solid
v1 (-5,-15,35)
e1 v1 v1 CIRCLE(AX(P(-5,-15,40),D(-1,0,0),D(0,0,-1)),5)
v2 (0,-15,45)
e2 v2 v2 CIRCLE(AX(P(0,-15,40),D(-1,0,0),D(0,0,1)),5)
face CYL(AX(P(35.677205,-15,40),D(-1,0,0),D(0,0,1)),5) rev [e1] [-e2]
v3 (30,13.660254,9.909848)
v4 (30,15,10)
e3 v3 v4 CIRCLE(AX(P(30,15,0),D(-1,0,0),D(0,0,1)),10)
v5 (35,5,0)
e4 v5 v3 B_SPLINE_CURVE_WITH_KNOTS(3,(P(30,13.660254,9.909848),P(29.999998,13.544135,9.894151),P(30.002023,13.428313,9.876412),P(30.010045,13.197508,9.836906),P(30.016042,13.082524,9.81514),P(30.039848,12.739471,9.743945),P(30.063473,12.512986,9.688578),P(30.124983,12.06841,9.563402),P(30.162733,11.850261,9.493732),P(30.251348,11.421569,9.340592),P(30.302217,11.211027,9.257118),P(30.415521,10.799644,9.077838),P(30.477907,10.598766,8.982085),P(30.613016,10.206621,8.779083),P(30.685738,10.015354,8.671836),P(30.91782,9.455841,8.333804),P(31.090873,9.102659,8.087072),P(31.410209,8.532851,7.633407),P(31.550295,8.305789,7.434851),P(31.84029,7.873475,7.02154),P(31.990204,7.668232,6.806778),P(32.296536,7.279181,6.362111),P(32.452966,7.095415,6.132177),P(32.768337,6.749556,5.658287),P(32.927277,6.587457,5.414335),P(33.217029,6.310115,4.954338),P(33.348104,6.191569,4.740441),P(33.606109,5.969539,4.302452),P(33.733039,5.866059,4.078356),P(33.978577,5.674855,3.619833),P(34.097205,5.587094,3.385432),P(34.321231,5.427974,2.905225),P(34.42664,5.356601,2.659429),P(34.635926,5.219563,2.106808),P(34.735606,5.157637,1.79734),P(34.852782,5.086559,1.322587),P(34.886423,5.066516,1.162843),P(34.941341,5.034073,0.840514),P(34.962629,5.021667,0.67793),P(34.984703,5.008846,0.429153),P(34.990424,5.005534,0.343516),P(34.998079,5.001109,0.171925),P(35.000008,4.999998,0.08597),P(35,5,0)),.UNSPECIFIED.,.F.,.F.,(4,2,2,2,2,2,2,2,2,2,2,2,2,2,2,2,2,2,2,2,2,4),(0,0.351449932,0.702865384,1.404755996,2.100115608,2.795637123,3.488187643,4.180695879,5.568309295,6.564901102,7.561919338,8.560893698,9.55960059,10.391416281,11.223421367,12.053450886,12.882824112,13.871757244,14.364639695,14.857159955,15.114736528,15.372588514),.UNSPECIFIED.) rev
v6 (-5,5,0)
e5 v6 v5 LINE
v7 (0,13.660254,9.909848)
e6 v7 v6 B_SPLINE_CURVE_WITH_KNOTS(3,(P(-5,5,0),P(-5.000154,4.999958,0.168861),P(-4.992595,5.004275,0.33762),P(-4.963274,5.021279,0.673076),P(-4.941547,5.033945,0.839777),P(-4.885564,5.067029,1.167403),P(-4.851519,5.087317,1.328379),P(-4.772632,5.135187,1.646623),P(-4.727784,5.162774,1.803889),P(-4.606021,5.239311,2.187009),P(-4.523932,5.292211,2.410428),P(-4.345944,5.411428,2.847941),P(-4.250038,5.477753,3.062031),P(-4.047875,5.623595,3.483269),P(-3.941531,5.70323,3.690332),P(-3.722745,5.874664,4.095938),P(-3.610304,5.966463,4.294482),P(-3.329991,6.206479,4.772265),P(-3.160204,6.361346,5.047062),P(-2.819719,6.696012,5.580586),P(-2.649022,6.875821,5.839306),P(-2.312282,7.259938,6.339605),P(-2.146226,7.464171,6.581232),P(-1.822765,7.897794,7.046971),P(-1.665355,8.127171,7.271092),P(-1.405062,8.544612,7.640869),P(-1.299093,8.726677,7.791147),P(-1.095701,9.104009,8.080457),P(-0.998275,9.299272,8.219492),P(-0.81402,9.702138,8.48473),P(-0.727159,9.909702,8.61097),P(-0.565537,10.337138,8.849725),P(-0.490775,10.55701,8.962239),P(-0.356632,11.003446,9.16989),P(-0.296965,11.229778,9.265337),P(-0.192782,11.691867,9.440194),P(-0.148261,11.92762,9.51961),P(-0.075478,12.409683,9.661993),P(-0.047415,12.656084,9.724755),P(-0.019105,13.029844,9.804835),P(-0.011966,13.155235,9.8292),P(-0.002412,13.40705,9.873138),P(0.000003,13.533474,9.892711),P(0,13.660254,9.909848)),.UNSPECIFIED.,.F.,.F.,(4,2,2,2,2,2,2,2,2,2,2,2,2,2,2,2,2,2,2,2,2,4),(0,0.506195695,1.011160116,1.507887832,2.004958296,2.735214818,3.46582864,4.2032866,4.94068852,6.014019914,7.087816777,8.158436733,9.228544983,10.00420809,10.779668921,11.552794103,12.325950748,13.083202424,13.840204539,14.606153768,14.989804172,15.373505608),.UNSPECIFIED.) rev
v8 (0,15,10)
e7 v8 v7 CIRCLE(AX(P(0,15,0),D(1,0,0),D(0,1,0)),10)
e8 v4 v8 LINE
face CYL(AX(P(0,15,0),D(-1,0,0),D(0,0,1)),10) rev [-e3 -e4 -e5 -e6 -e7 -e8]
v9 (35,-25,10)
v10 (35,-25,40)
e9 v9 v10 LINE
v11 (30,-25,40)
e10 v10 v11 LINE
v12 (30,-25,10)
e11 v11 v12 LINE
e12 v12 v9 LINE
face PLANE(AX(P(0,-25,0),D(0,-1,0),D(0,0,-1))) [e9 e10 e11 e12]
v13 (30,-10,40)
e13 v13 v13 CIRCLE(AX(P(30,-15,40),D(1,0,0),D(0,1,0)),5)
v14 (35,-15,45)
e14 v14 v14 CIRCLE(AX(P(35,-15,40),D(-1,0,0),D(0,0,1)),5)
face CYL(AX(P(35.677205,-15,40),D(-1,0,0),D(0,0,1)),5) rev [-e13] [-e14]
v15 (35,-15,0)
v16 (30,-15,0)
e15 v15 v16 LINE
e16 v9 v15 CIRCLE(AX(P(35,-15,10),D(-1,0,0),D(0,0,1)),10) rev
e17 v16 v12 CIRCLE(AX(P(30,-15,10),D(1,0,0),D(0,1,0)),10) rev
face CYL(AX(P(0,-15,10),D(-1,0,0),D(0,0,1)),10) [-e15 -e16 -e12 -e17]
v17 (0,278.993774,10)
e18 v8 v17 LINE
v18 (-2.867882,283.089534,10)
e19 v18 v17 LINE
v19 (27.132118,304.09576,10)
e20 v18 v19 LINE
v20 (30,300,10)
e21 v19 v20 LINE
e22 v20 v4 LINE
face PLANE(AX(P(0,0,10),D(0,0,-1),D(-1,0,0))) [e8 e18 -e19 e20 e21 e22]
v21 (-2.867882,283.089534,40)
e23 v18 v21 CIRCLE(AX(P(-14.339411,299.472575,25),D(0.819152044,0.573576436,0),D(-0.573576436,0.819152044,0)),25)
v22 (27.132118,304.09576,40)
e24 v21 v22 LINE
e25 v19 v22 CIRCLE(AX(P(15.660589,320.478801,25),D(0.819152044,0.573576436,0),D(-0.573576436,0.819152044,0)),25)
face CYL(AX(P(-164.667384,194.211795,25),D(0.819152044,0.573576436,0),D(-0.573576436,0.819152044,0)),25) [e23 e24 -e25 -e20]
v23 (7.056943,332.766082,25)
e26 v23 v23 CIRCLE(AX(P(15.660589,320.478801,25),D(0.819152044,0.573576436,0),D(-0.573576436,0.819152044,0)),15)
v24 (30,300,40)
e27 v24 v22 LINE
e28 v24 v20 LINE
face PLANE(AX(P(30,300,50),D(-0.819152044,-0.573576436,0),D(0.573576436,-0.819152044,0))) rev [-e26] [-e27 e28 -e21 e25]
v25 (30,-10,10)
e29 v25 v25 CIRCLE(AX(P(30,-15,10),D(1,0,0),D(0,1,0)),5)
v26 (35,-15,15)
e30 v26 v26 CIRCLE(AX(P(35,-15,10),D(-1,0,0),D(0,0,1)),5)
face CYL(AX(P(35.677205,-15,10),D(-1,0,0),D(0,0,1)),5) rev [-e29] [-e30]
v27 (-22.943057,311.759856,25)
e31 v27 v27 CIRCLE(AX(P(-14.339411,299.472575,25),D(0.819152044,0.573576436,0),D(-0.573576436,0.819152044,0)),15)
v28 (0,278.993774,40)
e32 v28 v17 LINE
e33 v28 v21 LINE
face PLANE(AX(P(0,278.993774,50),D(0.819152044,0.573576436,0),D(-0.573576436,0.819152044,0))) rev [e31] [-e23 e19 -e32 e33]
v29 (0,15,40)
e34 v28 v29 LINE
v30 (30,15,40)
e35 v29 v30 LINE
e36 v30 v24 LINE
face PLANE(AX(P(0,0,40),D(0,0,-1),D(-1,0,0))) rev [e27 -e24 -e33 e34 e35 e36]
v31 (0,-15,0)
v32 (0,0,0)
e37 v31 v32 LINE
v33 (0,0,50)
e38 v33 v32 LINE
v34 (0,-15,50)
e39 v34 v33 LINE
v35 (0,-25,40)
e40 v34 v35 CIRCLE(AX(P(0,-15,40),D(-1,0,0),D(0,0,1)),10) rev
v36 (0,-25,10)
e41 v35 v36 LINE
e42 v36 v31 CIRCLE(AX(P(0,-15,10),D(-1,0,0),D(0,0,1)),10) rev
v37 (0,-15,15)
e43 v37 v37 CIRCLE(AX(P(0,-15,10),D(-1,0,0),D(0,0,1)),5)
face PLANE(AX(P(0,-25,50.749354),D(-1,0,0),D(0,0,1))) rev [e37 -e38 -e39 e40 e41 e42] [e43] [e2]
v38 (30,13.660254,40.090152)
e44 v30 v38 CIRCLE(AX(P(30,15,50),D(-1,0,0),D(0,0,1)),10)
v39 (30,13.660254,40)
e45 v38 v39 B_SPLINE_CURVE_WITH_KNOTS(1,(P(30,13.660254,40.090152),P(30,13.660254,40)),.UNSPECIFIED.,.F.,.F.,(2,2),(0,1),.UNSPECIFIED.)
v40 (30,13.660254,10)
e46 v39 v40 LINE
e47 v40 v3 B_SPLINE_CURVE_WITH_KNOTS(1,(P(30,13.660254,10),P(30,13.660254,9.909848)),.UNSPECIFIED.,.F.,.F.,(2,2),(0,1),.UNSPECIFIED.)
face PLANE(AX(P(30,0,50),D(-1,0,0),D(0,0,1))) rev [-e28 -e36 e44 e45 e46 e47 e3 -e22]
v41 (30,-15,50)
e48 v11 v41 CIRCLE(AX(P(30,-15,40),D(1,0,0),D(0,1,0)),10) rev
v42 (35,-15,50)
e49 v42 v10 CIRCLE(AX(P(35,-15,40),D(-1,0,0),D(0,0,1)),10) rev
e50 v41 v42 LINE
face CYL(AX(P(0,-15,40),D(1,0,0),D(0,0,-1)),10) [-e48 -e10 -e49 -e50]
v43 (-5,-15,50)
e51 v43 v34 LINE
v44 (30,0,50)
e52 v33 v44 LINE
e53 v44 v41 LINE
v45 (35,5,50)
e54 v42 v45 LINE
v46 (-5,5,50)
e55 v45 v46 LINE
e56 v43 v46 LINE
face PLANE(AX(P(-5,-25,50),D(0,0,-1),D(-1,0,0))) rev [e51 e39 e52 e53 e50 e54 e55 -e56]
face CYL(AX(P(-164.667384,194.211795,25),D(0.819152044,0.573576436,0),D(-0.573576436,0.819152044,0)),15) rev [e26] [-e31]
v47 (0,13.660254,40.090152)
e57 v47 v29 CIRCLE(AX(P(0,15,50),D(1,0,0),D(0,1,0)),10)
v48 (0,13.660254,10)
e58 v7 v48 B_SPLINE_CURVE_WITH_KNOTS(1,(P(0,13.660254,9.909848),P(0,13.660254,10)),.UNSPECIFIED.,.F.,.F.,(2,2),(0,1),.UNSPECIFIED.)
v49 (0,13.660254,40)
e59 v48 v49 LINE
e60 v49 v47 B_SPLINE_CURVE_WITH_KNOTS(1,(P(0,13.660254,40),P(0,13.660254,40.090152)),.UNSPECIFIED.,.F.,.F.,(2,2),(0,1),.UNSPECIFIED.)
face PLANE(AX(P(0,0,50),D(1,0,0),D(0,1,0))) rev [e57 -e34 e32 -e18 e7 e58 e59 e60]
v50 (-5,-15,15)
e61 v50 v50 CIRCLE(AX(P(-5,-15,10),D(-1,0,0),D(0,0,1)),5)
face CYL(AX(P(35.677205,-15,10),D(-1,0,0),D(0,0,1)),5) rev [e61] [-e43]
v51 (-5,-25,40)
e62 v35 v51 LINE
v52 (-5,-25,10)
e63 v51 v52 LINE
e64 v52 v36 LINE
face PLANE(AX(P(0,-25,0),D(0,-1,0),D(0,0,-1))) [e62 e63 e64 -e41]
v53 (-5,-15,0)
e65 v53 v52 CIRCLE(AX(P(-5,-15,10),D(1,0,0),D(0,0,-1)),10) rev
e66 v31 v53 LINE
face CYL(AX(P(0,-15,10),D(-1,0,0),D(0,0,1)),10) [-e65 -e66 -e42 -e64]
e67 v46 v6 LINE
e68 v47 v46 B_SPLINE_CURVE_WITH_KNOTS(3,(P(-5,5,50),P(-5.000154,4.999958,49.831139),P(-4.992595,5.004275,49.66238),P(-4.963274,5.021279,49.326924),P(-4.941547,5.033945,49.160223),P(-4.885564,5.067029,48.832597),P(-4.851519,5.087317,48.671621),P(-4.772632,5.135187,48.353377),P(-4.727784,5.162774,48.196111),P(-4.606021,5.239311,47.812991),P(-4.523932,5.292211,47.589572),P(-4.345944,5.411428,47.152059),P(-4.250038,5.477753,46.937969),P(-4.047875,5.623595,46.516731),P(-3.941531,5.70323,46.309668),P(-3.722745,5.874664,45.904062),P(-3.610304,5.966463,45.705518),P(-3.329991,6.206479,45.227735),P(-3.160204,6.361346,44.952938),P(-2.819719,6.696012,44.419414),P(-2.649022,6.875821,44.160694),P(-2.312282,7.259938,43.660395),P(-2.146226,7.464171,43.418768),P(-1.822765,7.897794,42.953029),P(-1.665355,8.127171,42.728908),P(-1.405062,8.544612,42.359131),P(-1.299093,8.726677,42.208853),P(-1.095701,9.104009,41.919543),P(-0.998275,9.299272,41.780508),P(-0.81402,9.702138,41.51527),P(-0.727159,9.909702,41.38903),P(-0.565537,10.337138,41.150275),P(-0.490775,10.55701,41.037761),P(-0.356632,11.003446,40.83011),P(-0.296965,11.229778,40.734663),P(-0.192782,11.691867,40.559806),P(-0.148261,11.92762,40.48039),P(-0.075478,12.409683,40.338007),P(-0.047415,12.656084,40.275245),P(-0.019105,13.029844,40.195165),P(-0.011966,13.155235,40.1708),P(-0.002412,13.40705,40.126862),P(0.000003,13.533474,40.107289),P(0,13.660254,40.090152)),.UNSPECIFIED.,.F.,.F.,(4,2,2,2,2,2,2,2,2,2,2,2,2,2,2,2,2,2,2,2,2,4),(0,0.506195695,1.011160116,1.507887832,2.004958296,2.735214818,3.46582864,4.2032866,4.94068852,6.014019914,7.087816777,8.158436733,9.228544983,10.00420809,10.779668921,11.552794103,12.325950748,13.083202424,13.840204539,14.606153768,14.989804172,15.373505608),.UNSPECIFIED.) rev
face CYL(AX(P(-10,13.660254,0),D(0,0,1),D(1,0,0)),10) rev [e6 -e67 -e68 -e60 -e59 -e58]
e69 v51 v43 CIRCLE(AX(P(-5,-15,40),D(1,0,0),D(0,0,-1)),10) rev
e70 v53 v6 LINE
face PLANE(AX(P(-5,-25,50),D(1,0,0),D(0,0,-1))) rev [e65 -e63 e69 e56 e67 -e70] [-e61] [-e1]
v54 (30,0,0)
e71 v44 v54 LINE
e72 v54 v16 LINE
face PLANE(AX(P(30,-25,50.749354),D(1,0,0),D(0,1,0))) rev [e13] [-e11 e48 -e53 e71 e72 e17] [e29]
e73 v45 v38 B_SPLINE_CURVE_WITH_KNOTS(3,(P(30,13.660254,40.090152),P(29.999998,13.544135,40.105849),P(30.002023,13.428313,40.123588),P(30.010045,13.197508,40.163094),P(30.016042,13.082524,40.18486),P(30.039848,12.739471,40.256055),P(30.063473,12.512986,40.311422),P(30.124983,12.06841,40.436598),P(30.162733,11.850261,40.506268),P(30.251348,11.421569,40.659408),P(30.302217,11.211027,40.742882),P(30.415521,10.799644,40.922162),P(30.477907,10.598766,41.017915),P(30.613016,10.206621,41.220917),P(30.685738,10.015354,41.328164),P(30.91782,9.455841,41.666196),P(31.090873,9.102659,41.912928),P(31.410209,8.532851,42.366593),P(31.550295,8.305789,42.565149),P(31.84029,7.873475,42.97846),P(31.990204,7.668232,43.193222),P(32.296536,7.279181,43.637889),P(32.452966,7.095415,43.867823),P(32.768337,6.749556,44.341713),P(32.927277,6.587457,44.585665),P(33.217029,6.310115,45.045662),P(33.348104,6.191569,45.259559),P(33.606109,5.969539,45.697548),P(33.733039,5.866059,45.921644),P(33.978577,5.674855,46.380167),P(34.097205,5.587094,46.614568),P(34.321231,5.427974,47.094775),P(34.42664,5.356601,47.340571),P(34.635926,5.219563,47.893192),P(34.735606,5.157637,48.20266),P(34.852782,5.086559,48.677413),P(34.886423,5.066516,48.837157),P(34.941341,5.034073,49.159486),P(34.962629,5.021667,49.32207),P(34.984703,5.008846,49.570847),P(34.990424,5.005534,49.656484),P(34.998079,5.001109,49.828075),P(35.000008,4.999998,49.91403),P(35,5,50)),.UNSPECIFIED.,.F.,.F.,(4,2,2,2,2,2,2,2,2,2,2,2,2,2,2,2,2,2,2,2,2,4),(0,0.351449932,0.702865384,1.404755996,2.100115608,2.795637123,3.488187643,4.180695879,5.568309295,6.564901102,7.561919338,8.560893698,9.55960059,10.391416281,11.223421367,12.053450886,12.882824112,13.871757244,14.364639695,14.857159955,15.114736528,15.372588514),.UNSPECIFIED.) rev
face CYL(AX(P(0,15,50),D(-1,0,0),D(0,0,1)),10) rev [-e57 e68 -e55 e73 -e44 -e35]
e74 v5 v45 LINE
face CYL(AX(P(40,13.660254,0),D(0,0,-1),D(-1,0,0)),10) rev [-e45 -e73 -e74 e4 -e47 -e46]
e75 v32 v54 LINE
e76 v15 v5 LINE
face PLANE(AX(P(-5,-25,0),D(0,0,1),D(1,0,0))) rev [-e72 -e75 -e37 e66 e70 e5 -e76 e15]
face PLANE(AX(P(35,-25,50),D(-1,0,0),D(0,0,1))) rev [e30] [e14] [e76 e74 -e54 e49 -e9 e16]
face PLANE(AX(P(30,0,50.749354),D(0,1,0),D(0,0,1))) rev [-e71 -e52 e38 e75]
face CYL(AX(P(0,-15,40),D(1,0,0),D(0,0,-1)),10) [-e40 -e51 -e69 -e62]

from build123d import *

# Parameters (mm, degrees)
BOSS_EXTRUDE1_DEPTH = 50
CUT_EXTRUDE4_DEPTH  = 10
CUT_EXTRUDE5_DEPTH  = 10
SKETCH6_R           = 15
CUT_EXTRUDE6_DEPTH  = 301.947465254
CUT_EXTRUDE7_DEPTH  = 301.947465254
SKETCH8_W           = 30
SKETCH8_H           = 5
CUT_EXTRUDE8_DEPTH  = 346.907627132
SKETCH9_W           = 40
SKETCH9_H           = 50
BOSS_EXTRUDE2_DEPTH = 30
FILLET1_R           = 10
SKETCH10_W          = 30
SKETCH10_H          = 25
CUT_EXTRUDE9_DEPTH  = 347.377087182
SKETCH11_R          = 5
CUT_EXTRUDE10_DEPTH = 347.917982419


with BuildPart() as part:
    # Sketch1 → Boss-Extrude1 (new body)
    with BuildSketch(Plane.XY):
        Polygon((0, 0), (30, 0), (30, 300), (1.321178182, 340.957602214), (-28.678821818, 319.951376068), (0, 278.993773854), align=None)
    extrude(amount=BOSS_EXTRUDE1_DEPTH)

    # Sketch3 → Cut-Extrude4 (cut)
    with BuildSketch(Plane.XY.offset(50)):
        Polygon((30, 300), (0, 278.993773854), (0, 5), (30, 5), align=None)
    extrude(amount=-CUT_EXTRUDE4_DEPTH, mode=Mode.SUBTRACT)

    # Sketch4 → Cut-Extrude5 (cut)
    with BuildSketch(Plane(origin=(0, 0, 0), x_dir=(-1, 0, 0), z_dir=(0, 0, -1))):
        Polygon((-30, 300), (0, 278.993773854), (0, 5), (-30, 5), align=None)
    extrude(amount=-CUT_EXTRUDE5_DEPTH, mode=Mode.SUBTRACT)

    # Sketch6 → Cut-Extrude6 (cut, through all)
    with BuildSketch(Plane(origin=(161.084195268, 112.792367813, 0), x_dir=(0, 0, -1), z_dir=(0.819152044288991, 0.5735764363510472, 0))):
        with Locations(Location((-25, 253.538320196, 0), (0, 0, 90))):
            Circle(SKETCH6_R)
    extrude(amount=-CUT_EXTRUDE6_DEPTH, mode=Mode.SUBTRACT)

    # Sketch7 → Cut-Extrude7 (cut, through all)
    with BuildSketch(Plane(origin=(161.084195268, 112.792367813, 0), x_dir=(0, 0, -1), z_dir=(0.819152044288991, 0.5735764363510472, 0))):
        with BuildLine():
            Line((-50, 228.538320196), (-40, 228.538320196))
            Line((-40, 228.538320196), (-40, 233.538320196))
            ThreePointArc((-40, 233.538320196), (-47.360679775, 242.357980309), (-50, 253.538320196))
            Line((-50, 253.538320196), (-50, 228.538320196))
        make_face()
        with BuildLine():
            Line((-50, 278.538320196), (-50, 253.538320196))
            ThreePointArc((-50, 253.538320196), (-42.67766953, 271.215989726), (-25, 278.538320196))
            Line((-25, 278.538320196), (-50, 278.538320196))
        make_face()
        with BuildLine():
            Line((0, 278.538320196), (-25, 278.538320196))
            ThreePointArc((-25, 278.538320196), (-7.32233047, 271.215989726), (0, 253.538320196))
            Line((0, 253.538320196), (0, 278.538320196))
        make_face()
        with BuildLine():
            Line((0, 228.538320196), (0, 253.538320196))
            ThreePointArc((0, 253.538320196), (-2.639320225, 242.357980309), (-10, 233.538320196))
            Line((-10, 233.538320196), (-10, 228.538320196))
            Line((-10, 228.538320196), (0, 228.538320196))
        make_face()
    extrude(amount=-CUT_EXTRUDE7_DEPTH, mode=Mode.SUBTRACT)

    # Sketch8 → Cut-Extrude8 (cut, through all)
    with BuildSketch(Plane.XY.offset(50)):
        with Locations((15, 2.5)):
            Rectangle(SKETCH8_W, SKETCH8_H)
    extrude(amount=-CUT_EXTRUDE8_DEPTH, mode=Mode.SUBTRACT)

    # Sketch9 → Boss-Extrude2 (add)
    with BuildSketch(Plane.XZ.offset(-5)):
        with Locations((15, 25)):
            Rectangle(SKETCH9_W, SKETCH9_H)
    extrude(amount=BOSS_EXTRUDE2_DEPTH)

    # Fillet1
    # the kernel refuses this fillet: 10 mm, written as the material it adds along each edge
    with BuildSketch(Plane(origin=(0, 5, 40), x_dir=(-1, 0, 0), z_dir=(0, 0, -1))) as fillet1_piece_1:
        with BuildLine():
            CenterArc((10, 8.660254038), FILLET1_R, 180, 60)
            Line((0, 8.660254038), (0, 0))
            Line((0, 0), (5, 0))
        make_face()
    extrude(amount=30)
    with BuildSketch(Plane(origin=(30, 5, 40), x_dir=(1, 0, 0), z_dir=(0, 0, -1))) as fillet1_piece_2:
        with BuildLine():
            CenterArc((10, -8.660254038), FILLET1_R, 120, 60)
            Line((0, -8.660254038), (0, 0))
            Line((0, 0), (5, 0))
        make_face()
    extrude(amount=30)
    with BuildSketch(Plane(origin=(0, 5, 40), x_dir=(0, 0, 1), z_dir=(1, 0, 0))) as fillet1_piece_3:
        with BuildLine():
            CenterArc((FILLET1_R, -FILLET1_R), FILLET1_R, 90, 90)
            Line((0, -FILLET1_R), (0, 0))
            Line((0, 0), (FILLET1_R, 0))
        make_face()
    extrude(amount=30)
    with BuildSketch(Plane(origin=(0, 5, 10), x_dir=(0, 0, -1), z_dir=(1, 0, 0))) as fillet1_piece_4:
        with BuildLine():
            CenterArc((FILLET1_R, FILLET1_R), FILLET1_R, 180, 90)
            Line((0, FILLET1_R), (0, 0))
            Line((0, 0), (FILLET1_R, 0))
        make_face()
    extrude(amount=30)
    with BuildSketch(Plane(origin=(-25, 5, 40), x_dir=(0, 0, 1), z_dir=(1, 0, 0))) as fillet1_piece_5a_section:
        with BuildLine():
            CenterArc((FILLET1_R, -FILLET1_R), FILLET1_R, 90, 90)
            Line((0, -FILLET1_R), (0, 0))
            Line((0, 0), (FILLET1_R, 0))
        make_face()
    fillet1_piece_5a = extrude(amount=55, mode=Mode.PRIVATE)
    fillet1_piece_5a = split(fillet1_piece_5a, bisect_by=Plane(origin=(-5, 5, 40), z_dir=(1, 0, 0)), keep=Keep.TOP, mode=Mode.PRIVATE)
    fillet1_piece_5a = split(fillet1_piece_5a, bisect_by=Plane(origin=(0, 5, 40), z_dir=(-1, 0, 0)), keep=Keep.TOP, mode=Mode.PRIVATE)
    with BuildSketch(Plane(origin=(0, 5, 61.650635095), x_dir=(-1, 0, 0), z_dir=(0, 0, -1))) as fillet1_piece_5b_section:
        with BuildLine():
            CenterArc((10, 8.660254038), FILLET1_R, 180, 60)
            Line((0, 8.660254038), (0, 0))
            Line((0, 0), (5, 0))
        make_face()
    fillet1_piece_5b = extrude(amount=51.650635095, mode=Mode.PRIVATE)
    fillet1_piece_5b = split(fillet1_piece_5b, bisect_by=Plane(origin=(0, 5, 50), z_dir=(0, 0, -1)), keep=Keep.TOP, mode=Mode.PRIVATE)
    fillet1_piece_5b = split(fillet1_piece_5b, bisect_by=Plane(origin=(0, 5, 40), z_dir=(0, 0, 1)), keep=Keep.TOP, mode=Mode.PRIVATE)
    fillet1_piece_5 = fillet1_piece_5a & fillet1_piece_5b
    add(fillet1_piece_5)
    with BuildSketch(Plane(origin=(-25, 5, 10), x_dir=(0, 0, -1), z_dir=(1, 0, 0))) as fillet1_piece_6a_section:
        with BuildLine():
            CenterArc((FILLET1_R, FILLET1_R), FILLET1_R, 180, 90)
            Line((0, FILLET1_R), (0, 0))
            Line((0, 0), (FILLET1_R, 0))
        make_face()
    fillet1_piece_6a = extrude(amount=55, mode=Mode.PRIVATE)
    fillet1_piece_6a = split(fillet1_piece_6a, bisect_by=Plane(origin=(-5, 5, 10), z_dir=(1, 0, 0)), keep=Keep.TOP, mode=Mode.PRIVATE)
    fillet1_piece_6a = split(fillet1_piece_6a, bisect_by=Plane(origin=(0, 5, 10), z_dir=(-1, 0, 0)), keep=Keep.TOP, mode=Mode.PRIVATE)
    with BuildSketch(Plane(origin=(0, 5, 40), x_dir=(-1, 0, 0), z_dir=(0, 0, -1))) as fillet1_piece_6b_section:
        with BuildLine():
            CenterArc((10, 8.660254038), FILLET1_R, 180, 60)
            Line((0, 8.660254038), (0, 0))
            Line((0, 0), (5, 0))
        make_face()
    fillet1_piece_6b = extrude(amount=51.650635095, mode=Mode.PRIVATE)
    fillet1_piece_6b = split(fillet1_piece_6b, bisect_by=Plane(origin=(0, 5, 0), z_dir=(0, 0, 1)), keep=Keep.TOP, mode=Mode.PRIVATE)
    fillet1_piece_6b = split(fillet1_piece_6b, bisect_by=Plane(origin=(0, 5, 10), z_dir=(0, 0, -1)), keep=Keep.TOP, mode=Mode.PRIVATE)
    fillet1_piece_6 = fillet1_piece_6a & fillet1_piece_6b
    add(fillet1_piece_6)
    with BuildSketch(Plane(origin=(0, 5, 40), x_dir=(0, 0, 1), z_dir=(1, 0, 0))) as fillet1_piece_7a_section:
        with BuildLine():
            CenterArc((FILLET1_R, -FILLET1_R), FILLET1_R, 90, 90)
            Line((0, -FILLET1_R), (0, 0))
            Line((0, 0), (FILLET1_R, 0))
        make_face()
    fillet1_piece_7a = extrude(amount=55, mode=Mode.PRIVATE)
    fillet1_piece_7a = split(fillet1_piece_7a, bisect_by=Plane(origin=(35, 5, 40), z_dir=(-1, 0, 0)), keep=Keep.TOP, mode=Mode.PRIVATE)
    fillet1_piece_7a = split(fillet1_piece_7a, bisect_by=Plane(origin=(30, 5, 40), z_dir=(1, 0, 0)), keep=Keep.TOP, mode=Mode.PRIVATE)
    with BuildSketch(Plane(origin=(30, 5, 61.650635095), x_dir=(1, 0, 0), z_dir=(0, 0, -1))) as fillet1_piece_7b_section:
        with BuildLine():
            CenterArc((10, -8.660254038), FILLET1_R, 120, 60)
            Line((0, -8.660254038), (0, 0))
            Line((0, 0), (5, 0))
        make_face()
    fillet1_piece_7b = extrude(amount=51.650635095, mode=Mode.PRIVATE)
    fillet1_piece_7b = split(fillet1_piece_7b, bisect_by=Plane(origin=(30, 5, 50), z_dir=(0, 0, -1)), keep=Keep.TOP, mode=Mode.PRIVATE)
    fillet1_piece_7b = split(fillet1_piece_7b, bisect_by=Plane(origin=(30, 5, 40), z_dir=(0, 0, 1)), keep=Keep.TOP, mode=Mode.PRIVATE)
    fillet1_piece_7 = fillet1_piece_7a & fillet1_piece_7b
    add(fillet1_piece_7)
    with BuildSketch(Plane(origin=(30, 5, 40), x_dir=(1, 0, 0), z_dir=(0, 0, -1))) as fillet1_piece_8a_section:
        with BuildLine():
            CenterArc((10, -8.660254038), FILLET1_R, 120, 60)
            Line((0, -8.660254038), (0, 0))
            Line((0, 0), (5, 0))
        make_face()
    fillet1_piece_8a = extrude(amount=51.650635095, mode=Mode.PRIVATE)
    fillet1_piece_8a = split(fillet1_piece_8a, bisect_by=Plane(origin=(30, 5, 0), z_dir=(0, 0, 1)), keep=Keep.TOP, mode=Mode.PRIVATE)
    fillet1_piece_8a = split(fillet1_piece_8a, bisect_by=Plane(origin=(30, 5, 10), z_dir=(0, 0, -1)), keep=Keep.TOP, mode=Mode.PRIVATE)
    with BuildSketch(Plane(origin=(0, 5, 10), x_dir=(0, 0, -1), z_dir=(1, 0, 0))) as fillet1_piece_8b_section:
        with BuildLine():
            CenterArc((FILLET1_R, FILLET1_R), FILLET1_R, 180, 90)
            Line((0, FILLET1_R), (0, 0))
            Line((0, 0), (FILLET1_R, 0))
        make_face()
    fillet1_piece_8b = extrude(amount=55, mode=Mode.PRIVATE)
    fillet1_piece_8b = split(fillet1_piece_8b, bisect_by=Plane(origin=(35, 5, 10), z_dir=(-1, 0, 0)), keep=Keep.TOP, mode=Mode.PRIVATE)
    fillet1_piece_8b = split(fillet1_piece_8b, bisect_by=Plane(origin=(30, 5, 10), z_dir=(1, 0, 0)), keep=Keep.TOP, mode=Mode.PRIVATE)
    fillet1_piece_8 = fillet1_piece_8a & fillet1_piece_8b
    add(fillet1_piece_8)
    # the kernel refuses this fillet: 10 mm, written as the material it takes off along each edge
    with BuildSketch(Plane(origin=(60, -25, 0), x_dir=(0, 1, 0), z_dir=(-1, 0, 0)), Plane(origin=(-30, -25, 50), x_dir=(0, 1, 0), z_dir=(1, 0, 0))) as fillet1_2_piece_1:
        with BuildLine():
            CenterArc((FILLET1_R, -FILLET1_R), FILLET1_R, 90, 90)
            Line((0, -FILLET1_R), (0, 0))
            Line((0, 0), (FILLET1_R, 0))
        make_face()
    extrude(amount=90, mode=Mode.SUBTRACT)

    # Sketch10 → Cut-Extrude9 (cut, through all)
    with BuildSketch(Plane(origin=(0, 0, 0), x_dir=(-1, 0, 0), z_dir=(0, 0, -1))):
        with Locations((-15, -12.5)):
            Rectangle(SKETCH10_W, SKETCH10_H)
    extrude(amount=-CUT_EXTRUDE9_DEPTH, mode=Mode.SUBTRACT)

    # Sketch11 → Cut-Extrude10 (cut, through all)
    with BuildSketch(Plane.ZY.offset(5)):
        with Locations((10, -15)):
            Circle(SKETCH11_R)
        with Locations((40, -15)):
            Circle(SKETCH11_R)
    extrude(amount=-CUT_EXTRUDE10_DEPTH, mode=Mode.SUBTRACT)


solid = part.part
